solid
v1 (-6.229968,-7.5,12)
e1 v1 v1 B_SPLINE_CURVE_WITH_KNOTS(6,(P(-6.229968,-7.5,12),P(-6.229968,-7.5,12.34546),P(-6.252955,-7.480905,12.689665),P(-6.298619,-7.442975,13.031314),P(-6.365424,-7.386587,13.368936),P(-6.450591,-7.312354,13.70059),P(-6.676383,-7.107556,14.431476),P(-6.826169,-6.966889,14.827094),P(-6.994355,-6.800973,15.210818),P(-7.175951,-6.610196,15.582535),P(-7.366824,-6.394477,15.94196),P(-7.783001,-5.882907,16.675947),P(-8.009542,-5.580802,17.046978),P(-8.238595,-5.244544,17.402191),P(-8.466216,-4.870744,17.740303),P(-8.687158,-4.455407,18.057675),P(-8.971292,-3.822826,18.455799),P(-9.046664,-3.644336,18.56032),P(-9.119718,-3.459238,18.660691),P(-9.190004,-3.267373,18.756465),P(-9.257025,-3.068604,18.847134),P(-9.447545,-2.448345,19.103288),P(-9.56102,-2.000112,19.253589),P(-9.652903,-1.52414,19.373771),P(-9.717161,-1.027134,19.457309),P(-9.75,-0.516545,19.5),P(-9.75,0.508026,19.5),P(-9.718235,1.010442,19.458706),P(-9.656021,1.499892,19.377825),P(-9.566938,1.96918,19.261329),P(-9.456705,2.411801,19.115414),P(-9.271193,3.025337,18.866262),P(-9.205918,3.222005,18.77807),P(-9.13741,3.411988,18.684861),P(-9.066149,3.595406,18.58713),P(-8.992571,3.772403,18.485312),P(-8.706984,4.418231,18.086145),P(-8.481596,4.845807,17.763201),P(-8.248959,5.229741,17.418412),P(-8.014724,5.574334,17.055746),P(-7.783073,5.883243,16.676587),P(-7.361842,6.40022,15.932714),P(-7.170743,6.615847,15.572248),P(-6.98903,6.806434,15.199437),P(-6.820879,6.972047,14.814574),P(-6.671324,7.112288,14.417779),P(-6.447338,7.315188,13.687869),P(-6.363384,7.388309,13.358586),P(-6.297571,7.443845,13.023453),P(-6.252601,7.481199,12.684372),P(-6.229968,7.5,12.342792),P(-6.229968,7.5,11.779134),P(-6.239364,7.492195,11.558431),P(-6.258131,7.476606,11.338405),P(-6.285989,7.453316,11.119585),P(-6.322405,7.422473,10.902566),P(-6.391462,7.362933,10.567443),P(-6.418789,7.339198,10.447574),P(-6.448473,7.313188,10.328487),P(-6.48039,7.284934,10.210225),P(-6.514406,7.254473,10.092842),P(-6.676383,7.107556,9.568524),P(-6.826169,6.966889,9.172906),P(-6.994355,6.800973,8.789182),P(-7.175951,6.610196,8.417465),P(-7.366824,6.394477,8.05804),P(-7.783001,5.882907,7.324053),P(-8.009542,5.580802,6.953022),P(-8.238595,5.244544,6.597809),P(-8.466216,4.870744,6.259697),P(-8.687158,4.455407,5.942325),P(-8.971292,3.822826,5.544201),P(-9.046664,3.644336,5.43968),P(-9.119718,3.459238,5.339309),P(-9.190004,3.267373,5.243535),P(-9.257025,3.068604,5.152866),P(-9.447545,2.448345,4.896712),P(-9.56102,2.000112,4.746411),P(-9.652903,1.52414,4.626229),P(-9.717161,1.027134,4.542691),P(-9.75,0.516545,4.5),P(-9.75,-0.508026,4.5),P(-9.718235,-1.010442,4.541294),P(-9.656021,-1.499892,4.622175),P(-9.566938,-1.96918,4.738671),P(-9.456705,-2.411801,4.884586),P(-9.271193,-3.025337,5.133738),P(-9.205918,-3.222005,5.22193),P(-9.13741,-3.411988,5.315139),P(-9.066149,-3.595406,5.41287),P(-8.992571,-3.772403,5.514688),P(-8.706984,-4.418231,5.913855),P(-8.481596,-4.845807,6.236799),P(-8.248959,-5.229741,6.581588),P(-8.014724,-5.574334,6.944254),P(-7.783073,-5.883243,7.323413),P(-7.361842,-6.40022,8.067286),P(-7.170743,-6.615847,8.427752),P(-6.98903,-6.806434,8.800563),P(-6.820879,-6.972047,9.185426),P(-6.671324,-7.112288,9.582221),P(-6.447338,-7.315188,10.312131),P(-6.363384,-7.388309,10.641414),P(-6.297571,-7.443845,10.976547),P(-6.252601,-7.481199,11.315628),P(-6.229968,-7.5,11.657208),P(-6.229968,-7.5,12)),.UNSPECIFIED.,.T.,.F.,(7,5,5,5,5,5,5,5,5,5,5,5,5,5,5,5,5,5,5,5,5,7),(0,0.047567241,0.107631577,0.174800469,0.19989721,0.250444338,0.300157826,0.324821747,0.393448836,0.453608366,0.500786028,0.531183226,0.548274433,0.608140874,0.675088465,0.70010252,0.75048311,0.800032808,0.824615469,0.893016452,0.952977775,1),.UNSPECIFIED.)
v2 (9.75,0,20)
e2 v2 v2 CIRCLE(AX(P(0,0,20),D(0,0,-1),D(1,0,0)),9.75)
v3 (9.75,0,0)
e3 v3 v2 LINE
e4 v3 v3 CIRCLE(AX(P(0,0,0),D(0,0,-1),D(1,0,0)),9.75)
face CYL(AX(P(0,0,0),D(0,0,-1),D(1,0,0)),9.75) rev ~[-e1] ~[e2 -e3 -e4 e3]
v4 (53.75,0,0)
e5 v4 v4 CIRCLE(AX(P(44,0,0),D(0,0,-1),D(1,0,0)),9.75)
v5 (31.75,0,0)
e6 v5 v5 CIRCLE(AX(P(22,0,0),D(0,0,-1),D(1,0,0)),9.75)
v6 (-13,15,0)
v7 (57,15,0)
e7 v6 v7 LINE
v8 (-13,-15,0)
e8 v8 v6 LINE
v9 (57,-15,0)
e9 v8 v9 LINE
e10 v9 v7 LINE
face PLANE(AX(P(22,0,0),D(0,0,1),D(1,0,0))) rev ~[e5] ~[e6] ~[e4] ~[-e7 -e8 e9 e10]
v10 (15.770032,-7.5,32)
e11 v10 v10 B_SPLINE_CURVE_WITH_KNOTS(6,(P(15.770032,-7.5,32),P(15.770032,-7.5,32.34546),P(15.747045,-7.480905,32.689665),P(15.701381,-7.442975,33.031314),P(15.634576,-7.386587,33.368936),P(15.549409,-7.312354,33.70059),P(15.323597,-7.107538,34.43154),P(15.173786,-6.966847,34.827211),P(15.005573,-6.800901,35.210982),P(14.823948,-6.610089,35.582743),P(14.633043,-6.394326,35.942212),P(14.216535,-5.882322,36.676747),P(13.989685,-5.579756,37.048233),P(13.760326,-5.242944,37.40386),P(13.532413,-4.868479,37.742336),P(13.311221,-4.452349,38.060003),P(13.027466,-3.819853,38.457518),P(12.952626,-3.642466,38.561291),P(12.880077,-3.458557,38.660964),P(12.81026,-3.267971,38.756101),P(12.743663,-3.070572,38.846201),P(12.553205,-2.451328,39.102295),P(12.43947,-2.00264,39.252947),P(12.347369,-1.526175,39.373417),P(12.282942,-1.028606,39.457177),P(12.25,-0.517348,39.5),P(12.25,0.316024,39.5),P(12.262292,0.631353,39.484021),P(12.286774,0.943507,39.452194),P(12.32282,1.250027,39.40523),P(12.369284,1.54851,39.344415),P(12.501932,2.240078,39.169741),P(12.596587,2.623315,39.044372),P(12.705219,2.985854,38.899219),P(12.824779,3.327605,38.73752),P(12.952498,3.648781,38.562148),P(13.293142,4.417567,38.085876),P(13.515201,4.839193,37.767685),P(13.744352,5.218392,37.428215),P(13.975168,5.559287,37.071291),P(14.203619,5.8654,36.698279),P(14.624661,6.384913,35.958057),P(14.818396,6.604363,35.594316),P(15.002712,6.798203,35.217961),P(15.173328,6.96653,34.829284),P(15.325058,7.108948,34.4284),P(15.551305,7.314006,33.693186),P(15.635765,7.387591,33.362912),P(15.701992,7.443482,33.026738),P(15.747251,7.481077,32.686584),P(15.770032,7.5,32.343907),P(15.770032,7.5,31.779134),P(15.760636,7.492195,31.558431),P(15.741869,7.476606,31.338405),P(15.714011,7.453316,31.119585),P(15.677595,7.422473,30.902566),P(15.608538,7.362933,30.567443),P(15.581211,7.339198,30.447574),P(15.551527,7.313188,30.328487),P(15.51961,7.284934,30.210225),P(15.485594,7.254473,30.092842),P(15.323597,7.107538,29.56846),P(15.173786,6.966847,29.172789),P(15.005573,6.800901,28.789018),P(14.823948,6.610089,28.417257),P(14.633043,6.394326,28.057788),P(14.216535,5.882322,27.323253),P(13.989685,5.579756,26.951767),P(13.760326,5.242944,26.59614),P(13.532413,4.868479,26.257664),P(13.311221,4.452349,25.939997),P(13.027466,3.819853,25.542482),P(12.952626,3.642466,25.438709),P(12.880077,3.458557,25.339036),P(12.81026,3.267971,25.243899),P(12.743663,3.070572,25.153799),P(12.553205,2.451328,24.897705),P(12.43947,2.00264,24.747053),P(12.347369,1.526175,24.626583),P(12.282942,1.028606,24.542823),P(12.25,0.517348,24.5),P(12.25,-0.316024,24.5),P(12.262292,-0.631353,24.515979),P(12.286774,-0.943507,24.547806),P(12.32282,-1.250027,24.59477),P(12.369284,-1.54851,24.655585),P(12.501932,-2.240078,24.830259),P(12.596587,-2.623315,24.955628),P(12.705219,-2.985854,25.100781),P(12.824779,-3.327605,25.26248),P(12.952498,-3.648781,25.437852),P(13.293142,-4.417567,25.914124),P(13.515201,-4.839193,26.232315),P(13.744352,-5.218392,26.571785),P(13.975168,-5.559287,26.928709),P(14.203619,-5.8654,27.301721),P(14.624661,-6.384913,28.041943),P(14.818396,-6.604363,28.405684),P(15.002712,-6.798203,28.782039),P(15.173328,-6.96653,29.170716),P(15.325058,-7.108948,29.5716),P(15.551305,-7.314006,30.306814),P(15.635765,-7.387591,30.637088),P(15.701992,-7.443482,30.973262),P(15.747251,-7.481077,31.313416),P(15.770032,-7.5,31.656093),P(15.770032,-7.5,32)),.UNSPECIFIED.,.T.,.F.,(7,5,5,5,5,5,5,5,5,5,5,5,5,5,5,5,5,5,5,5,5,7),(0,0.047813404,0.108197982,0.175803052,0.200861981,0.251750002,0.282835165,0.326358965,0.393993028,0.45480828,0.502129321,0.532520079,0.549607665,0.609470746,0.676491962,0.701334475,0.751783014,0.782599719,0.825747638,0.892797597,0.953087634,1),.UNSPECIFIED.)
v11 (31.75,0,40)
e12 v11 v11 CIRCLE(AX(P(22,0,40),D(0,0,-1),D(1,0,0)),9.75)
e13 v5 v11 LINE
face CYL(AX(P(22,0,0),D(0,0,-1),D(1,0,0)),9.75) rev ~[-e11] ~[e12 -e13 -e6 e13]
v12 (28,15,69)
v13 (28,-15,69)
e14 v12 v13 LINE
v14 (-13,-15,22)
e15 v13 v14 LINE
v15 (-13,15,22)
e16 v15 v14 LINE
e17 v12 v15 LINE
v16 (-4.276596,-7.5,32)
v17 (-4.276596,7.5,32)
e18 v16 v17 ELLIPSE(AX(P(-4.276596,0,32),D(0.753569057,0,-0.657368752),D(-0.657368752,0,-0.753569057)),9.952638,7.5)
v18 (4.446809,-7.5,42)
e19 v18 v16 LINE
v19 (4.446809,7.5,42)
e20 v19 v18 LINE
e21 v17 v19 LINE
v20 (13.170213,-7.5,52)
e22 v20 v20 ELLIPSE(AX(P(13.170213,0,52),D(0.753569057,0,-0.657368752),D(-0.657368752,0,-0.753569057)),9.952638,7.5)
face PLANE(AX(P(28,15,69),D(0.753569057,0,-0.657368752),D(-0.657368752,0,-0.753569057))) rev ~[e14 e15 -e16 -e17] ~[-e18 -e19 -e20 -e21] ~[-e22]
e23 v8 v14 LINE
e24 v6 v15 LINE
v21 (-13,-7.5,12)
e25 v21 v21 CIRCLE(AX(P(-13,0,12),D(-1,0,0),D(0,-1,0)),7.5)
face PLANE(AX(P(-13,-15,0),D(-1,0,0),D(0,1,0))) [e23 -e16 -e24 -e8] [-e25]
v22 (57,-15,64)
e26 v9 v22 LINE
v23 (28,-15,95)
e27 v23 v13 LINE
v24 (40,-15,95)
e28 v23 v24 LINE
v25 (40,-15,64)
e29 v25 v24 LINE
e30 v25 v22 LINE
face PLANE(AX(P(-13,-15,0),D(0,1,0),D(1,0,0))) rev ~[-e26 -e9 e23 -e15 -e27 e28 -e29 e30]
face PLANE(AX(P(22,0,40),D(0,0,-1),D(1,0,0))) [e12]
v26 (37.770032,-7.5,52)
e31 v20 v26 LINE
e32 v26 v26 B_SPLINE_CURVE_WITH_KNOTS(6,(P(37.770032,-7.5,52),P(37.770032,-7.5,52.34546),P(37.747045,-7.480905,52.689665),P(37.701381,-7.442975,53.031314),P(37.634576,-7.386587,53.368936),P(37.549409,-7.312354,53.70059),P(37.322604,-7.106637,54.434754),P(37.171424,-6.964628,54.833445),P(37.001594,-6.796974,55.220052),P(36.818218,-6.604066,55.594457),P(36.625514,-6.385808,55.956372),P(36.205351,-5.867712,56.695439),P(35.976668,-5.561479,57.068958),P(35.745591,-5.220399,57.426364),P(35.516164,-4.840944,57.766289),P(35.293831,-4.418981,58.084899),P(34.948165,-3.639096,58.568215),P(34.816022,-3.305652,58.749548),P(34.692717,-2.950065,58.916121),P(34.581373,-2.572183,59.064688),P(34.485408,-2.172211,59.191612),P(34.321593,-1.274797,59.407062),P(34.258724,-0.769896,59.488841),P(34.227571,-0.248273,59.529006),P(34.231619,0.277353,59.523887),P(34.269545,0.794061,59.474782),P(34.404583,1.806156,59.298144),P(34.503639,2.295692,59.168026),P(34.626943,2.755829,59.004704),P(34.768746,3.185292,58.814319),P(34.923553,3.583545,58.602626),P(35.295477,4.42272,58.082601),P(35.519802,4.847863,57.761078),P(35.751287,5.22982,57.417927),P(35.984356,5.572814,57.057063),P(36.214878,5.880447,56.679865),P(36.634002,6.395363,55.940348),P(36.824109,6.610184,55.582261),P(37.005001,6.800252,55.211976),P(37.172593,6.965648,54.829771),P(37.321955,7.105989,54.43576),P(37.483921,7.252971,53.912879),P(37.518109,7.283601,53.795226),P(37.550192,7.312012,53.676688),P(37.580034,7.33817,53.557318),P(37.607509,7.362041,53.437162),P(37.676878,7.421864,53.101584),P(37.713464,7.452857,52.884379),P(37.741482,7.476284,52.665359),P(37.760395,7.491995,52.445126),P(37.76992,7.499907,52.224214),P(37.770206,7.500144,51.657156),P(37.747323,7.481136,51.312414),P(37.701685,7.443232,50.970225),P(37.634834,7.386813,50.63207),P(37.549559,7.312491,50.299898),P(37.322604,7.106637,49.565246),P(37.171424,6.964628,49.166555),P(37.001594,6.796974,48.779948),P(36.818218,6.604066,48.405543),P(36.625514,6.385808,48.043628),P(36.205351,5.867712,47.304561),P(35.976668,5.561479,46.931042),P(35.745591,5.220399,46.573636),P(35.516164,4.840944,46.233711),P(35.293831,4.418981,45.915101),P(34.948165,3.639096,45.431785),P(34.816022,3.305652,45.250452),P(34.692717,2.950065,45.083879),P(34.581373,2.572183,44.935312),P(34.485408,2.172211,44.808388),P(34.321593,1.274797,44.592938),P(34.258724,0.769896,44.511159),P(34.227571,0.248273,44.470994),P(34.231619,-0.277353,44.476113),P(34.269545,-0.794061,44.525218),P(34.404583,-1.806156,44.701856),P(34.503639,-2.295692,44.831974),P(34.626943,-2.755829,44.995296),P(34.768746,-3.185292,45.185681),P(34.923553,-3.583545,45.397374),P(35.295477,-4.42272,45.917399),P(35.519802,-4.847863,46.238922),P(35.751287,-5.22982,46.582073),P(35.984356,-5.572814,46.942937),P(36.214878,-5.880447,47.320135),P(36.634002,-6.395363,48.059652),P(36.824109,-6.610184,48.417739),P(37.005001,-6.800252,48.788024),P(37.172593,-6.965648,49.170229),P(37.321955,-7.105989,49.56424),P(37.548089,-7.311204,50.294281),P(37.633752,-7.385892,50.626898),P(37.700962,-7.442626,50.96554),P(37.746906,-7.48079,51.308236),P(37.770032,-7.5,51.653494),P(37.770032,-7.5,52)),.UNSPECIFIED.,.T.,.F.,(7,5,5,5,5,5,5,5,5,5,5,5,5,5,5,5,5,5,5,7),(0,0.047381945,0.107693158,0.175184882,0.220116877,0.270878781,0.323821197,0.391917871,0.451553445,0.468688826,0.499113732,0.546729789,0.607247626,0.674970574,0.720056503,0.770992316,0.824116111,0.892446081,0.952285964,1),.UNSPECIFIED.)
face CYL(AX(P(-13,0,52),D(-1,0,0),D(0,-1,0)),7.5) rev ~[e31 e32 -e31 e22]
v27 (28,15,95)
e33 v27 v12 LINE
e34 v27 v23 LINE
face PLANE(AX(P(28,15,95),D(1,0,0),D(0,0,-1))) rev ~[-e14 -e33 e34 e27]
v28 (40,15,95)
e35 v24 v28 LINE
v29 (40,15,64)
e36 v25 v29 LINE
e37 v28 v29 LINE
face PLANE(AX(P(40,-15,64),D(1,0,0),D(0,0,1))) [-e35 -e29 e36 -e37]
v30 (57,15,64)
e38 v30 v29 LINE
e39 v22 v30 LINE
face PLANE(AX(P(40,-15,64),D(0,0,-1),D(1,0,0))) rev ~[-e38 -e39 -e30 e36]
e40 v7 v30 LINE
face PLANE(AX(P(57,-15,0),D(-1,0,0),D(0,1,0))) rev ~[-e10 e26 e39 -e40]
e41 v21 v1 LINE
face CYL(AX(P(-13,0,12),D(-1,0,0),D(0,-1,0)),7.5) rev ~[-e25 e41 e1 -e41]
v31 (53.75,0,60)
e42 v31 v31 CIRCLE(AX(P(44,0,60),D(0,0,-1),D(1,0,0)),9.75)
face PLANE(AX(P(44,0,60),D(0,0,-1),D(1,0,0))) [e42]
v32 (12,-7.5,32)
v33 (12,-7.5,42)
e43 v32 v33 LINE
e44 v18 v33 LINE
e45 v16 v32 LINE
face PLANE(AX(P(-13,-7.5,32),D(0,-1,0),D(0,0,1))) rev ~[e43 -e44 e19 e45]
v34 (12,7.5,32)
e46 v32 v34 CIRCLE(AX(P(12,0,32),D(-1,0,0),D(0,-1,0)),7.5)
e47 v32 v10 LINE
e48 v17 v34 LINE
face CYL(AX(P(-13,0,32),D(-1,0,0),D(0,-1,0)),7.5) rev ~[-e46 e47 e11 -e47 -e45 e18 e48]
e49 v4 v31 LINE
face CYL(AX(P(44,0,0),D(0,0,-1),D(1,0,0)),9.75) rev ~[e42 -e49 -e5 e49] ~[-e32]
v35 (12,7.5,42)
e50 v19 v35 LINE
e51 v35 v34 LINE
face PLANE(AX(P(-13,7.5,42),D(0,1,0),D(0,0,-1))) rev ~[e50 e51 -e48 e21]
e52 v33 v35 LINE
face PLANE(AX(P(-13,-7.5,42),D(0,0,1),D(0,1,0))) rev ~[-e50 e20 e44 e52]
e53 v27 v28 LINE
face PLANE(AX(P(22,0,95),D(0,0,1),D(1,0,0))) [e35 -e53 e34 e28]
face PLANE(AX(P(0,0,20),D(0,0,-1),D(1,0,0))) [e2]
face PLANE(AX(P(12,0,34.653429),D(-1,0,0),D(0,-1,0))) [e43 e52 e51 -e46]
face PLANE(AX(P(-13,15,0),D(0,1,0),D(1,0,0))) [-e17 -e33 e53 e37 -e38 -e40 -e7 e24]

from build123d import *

# Parameters (mm, degrees)
F0_W      = 70
F0_H      = 30
F1_DEPTH  = 95
F2_W      = 17
F2_H      = 31
F3_DEPTH  = 41.4
F4_R      = 9.75
F5_DEPTH  = 60
F8_DEPTH  = 43.7
F6_R      = 7.5
F9_DEPTH  = 57
F10_R     = 9.75
F11_DEPTH = 40
F12_R     = 9.75
F13_DEPTH = 20
F14_R     = 7.5
F15_DEPTH = 32.1
F16_R     = 7.5
F17_DEPTH = 11.1
F19_DEPTH = 25


# Not quite as in the source:
# - a feature names something its author has since deleted; it is built from what else it names


with BuildPart() as f1:
    # F0 (on Top) → F1 (new body)
    with BuildSketch(Plane.XY):
        with Locations((22, 0)):
            Rectangle(F0_W, F0_H)
    extrude(amount=F1_DEPTH)

    # F2 (on face) → F3 (cut)
    with BuildSketch(Plane.XZ.offset(15)):
        with Locations((48.5, 79.5)):
            Rectangle(F2_W, F2_H)
    extrude(amount=-F3_DEPTH, mode=Mode.SUBTRACT)

    # F4 (on face) → F5 (cut)
    with BuildSketch(Plane(origin=(0, 0, 0), x_dir=(1, 0, 0), z_dir=(0, 0, -1))):
        with Locations((44, 0)):
            Circle(F4_R)
    extrude(amount=-F5_DEPTH, mode=Mode.SUBTRACT)

    # F7 (on face) → F8 (cut)
    with BuildSketch(Plane(origin=(0, 15, 0), x_dir=(-1, 0, 0), z_dir=(0, 1, 0))):
        Polygon((13, 95), (-28, 95), (-28, 69), (13, 22), align=None)
    extrude(amount=-F8_DEPTH, mode=Mode.SUBTRACT)

    # F6 (on face) → F9 (cut)
    with BuildSketch(Plane(origin=(-13, 0, 0), x_dir=(0, -1, 0), z_dir=(-1, 0, 0))):
        with Locations((0, 52)):
            Circle(F6_R)
    extrude(amount=-F9_DEPTH, mode=Mode.SUBTRACT)

    # F10 (on face) → F11 (cut)
    with BuildSketch(Plane(origin=(0, 0, 0), x_dir=(1, 0, 0), z_dir=(0, 0, -1))):
        with Locations((22, 0)):
            Circle(F10_R)
    extrude(amount=-F11_DEPTH, mode=Mode.SUBTRACT)

    # F12 (on face) → F13 (cut)
    with BuildSketch(Plane(origin=(0, 0, 0), x_dir=(1, 0, 0), z_dir=(0, 0, -1))):
        Circle(F12_R)
    extrude(amount=-F13_DEPTH, mode=Mode.SUBTRACT)

    # F14 (on face) → F15 (cut)
    with BuildSketch(Plane(origin=(-13, 0, 0), x_dir=(0, -1, 0), z_dir=(-1, 0, 0))):
        with Locations((0, 32)):
            Circle(F14_R)
    extrude(amount=-F15_DEPTH, mode=Mode.SUBTRACT)

    # F16 (on face) → F17 (cut)
    with BuildSketch(Plane(origin=(-13, 0, 0), x_dir=(0, -1, 0), z_dir=(-1, 0, 0))):
        with Locations((0, 12)):
            Circle(F16_R)
    extrude(amount=-F17_DEPTH, mode=Mode.SUBTRACT)

    # F18 (on face) → F19 (cut)
    with BuildSketch(Plane(origin=(-13, 0, 0), x_dir=(0, -1, 0), z_dir=(-1, 0, 0))):
        with BuildLine():
            Line((-7.5, 42), (-7.5, 32))
            ThreePointArc((-7.5, 32), (0, 24.5), (7.5, 32))
            Line((7.5, 32), (7.5, 42))
            Line((7.5, 42), (-7.5, 42))
        make_face()
    extrude(amount=-F19_DEPTH, mode=Mode.SUBTRACT)


solid = f1.part
